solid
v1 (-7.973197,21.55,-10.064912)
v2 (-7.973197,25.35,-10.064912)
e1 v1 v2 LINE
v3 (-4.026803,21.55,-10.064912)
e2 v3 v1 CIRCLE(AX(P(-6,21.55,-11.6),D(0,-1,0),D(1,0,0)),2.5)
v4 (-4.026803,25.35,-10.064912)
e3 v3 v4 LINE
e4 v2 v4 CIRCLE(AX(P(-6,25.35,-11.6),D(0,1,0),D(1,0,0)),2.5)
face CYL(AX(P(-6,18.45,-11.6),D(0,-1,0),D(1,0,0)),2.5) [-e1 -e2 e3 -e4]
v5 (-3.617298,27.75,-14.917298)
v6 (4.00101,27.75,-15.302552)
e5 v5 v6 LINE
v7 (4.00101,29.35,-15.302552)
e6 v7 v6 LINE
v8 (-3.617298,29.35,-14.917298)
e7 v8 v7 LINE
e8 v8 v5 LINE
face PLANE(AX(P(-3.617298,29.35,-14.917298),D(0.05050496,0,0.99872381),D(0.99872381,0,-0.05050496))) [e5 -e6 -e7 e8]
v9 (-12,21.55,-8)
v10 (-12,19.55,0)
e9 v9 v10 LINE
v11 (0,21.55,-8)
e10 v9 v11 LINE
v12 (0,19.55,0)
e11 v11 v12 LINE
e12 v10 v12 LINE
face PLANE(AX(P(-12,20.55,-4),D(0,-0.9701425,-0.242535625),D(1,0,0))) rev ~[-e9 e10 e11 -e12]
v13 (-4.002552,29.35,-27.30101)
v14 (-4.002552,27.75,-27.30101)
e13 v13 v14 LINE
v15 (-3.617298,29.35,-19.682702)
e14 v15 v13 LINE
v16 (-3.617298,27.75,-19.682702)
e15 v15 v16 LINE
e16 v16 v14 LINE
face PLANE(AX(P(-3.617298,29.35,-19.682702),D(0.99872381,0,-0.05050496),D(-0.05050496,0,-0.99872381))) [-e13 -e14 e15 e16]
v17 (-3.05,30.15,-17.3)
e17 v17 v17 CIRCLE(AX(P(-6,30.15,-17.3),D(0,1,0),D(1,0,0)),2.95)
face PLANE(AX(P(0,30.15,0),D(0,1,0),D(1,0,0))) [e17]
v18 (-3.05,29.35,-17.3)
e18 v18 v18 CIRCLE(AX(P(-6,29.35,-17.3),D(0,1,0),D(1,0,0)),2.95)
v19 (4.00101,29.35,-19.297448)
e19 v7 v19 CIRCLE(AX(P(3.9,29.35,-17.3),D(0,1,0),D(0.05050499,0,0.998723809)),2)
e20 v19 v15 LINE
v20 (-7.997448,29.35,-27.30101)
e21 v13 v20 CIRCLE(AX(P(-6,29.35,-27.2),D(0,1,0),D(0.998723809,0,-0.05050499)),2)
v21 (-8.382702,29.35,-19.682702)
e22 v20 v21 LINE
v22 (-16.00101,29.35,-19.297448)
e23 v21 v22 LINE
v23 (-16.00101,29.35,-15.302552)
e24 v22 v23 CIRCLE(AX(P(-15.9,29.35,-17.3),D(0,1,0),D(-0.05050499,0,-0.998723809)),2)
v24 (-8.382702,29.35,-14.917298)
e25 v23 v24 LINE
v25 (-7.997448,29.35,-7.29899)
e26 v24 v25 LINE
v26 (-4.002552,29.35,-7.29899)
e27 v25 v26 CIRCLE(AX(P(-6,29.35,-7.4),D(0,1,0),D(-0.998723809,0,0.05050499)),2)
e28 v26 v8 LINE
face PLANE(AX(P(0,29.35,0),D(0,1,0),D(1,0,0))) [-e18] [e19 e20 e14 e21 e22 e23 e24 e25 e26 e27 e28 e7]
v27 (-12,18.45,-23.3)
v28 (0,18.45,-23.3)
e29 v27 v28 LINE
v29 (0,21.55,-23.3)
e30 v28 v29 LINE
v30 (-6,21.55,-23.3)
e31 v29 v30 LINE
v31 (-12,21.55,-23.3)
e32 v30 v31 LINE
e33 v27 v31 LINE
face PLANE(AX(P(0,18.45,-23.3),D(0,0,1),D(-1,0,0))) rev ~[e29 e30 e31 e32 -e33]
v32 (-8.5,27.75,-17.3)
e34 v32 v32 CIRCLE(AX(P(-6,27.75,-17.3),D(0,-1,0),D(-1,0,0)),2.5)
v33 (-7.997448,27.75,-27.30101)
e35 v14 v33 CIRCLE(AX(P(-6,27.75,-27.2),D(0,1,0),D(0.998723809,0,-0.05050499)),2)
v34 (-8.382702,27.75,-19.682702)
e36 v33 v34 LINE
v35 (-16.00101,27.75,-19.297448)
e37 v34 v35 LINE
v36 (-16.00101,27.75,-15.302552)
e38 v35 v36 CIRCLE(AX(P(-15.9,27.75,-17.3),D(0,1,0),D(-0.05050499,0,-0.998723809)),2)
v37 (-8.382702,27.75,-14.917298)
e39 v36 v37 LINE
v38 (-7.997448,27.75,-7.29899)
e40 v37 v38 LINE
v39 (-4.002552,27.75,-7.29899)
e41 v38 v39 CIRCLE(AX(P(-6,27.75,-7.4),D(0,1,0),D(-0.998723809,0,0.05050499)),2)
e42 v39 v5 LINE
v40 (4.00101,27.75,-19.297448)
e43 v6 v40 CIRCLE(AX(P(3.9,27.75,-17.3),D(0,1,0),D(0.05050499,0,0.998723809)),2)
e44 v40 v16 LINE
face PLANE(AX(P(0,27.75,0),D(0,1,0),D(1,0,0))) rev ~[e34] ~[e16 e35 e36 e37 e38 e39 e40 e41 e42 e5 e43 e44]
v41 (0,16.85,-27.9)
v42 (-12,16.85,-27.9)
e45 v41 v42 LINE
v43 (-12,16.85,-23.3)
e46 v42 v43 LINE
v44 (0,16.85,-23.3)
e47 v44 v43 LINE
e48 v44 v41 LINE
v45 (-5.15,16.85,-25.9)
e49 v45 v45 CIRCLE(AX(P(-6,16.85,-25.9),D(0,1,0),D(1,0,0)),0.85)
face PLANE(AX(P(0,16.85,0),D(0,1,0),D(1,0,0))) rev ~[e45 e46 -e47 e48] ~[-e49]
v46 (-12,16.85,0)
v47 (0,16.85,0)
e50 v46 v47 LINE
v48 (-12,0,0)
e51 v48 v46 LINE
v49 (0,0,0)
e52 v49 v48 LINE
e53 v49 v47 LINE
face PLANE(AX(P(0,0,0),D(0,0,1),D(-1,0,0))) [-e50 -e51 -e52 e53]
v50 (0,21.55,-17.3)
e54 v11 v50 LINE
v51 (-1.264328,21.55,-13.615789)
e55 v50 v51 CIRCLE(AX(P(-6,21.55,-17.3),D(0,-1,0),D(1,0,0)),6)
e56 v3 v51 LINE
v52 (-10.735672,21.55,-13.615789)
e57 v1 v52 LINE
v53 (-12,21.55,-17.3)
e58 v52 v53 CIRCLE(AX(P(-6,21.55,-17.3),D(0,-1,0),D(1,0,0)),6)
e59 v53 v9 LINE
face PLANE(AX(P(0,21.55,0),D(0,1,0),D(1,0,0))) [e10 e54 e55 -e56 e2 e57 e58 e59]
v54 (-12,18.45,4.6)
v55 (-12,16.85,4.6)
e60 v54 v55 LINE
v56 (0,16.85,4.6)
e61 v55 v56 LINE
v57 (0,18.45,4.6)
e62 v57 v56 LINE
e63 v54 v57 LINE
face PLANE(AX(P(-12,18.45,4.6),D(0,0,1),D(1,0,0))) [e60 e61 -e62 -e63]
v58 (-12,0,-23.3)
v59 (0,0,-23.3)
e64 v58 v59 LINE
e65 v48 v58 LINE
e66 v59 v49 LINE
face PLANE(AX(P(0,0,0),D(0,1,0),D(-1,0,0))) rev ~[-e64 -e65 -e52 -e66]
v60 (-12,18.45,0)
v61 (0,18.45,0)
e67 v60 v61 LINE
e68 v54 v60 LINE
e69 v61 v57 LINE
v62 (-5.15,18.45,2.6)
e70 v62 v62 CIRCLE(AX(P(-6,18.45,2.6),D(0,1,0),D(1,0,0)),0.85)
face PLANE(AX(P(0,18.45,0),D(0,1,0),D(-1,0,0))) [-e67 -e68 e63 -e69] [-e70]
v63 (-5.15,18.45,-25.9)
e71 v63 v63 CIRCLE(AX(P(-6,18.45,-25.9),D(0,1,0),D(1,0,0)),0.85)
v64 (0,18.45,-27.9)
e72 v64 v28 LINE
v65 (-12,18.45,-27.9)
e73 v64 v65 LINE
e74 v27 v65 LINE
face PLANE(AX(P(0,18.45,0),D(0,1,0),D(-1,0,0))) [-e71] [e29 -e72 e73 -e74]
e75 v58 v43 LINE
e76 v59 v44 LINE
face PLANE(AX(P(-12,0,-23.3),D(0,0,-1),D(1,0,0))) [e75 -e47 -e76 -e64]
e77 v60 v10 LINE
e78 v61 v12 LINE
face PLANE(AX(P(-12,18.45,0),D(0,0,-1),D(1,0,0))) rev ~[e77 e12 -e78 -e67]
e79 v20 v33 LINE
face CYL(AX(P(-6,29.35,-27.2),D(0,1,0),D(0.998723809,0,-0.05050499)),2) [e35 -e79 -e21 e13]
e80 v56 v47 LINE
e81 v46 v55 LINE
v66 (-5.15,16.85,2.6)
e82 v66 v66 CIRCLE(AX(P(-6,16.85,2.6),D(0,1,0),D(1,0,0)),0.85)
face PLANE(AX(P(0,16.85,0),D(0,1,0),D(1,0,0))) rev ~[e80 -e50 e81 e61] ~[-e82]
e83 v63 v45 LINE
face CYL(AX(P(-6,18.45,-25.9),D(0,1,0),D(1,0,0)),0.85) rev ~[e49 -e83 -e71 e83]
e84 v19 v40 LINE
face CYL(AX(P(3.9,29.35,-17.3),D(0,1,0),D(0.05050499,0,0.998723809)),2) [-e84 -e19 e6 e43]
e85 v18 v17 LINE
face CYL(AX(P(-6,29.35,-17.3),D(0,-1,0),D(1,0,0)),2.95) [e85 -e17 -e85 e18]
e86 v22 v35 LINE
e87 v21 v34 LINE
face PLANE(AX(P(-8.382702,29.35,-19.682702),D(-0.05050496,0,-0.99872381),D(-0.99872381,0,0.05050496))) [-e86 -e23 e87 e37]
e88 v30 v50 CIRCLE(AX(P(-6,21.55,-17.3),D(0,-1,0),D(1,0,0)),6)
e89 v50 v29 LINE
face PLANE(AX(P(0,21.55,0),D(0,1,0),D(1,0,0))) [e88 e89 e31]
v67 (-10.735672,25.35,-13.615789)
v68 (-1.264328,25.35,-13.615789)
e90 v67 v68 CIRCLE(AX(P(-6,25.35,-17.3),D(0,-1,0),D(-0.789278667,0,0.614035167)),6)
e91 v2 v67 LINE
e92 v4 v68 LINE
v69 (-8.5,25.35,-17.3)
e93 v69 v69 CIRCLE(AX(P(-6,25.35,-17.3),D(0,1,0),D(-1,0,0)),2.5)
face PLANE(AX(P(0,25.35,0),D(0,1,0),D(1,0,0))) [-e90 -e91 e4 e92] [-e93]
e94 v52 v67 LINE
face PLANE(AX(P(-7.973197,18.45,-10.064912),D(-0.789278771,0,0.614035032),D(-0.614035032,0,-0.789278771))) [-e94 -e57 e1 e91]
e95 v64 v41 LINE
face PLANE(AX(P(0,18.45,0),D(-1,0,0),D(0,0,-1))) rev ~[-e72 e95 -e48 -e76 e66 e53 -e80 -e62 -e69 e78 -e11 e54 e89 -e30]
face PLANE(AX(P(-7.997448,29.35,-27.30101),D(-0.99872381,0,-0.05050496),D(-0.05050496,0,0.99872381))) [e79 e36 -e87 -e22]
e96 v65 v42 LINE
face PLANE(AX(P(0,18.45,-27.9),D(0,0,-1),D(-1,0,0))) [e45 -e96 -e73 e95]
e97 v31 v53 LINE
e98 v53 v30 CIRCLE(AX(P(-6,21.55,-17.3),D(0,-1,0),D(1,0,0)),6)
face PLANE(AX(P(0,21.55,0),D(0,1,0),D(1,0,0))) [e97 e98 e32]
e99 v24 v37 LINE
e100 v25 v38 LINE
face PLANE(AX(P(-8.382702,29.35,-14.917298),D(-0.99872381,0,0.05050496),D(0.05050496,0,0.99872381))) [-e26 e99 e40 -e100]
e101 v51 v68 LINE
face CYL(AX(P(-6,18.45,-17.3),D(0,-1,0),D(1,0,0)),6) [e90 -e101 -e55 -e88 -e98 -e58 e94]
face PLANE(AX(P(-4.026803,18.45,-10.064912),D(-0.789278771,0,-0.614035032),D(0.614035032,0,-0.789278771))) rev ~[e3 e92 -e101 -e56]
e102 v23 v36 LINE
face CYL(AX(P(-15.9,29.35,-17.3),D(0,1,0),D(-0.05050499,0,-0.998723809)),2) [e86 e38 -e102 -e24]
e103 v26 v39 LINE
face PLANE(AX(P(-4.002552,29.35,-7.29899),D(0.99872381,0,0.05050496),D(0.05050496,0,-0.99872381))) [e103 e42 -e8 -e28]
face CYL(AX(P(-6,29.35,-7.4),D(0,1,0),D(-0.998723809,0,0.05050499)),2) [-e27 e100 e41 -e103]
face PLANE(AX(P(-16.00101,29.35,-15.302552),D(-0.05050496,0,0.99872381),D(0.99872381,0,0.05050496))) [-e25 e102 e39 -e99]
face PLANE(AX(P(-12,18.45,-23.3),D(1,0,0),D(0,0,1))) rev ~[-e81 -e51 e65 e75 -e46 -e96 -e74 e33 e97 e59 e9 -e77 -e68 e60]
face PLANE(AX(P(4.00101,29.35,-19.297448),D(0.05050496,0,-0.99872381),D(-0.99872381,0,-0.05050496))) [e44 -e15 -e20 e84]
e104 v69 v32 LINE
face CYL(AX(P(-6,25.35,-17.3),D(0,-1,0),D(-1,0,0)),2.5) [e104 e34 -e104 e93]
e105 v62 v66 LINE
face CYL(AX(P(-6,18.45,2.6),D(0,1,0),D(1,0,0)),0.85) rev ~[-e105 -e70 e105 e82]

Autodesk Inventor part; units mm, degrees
ref_plane "YZ Plane" through (0, 0, 0) normal (1, 0, 0) x (0, 1, 0)
ref_plane "XZ Plane" through (0, 0, 0) normal (0, 1, 0) x (-1, 0, 0)
sketch "スケッチ1" plane through (0, 0, 0) normal (0, 1, 0) x (-1, 0, 0)
  line L0 (0, 0) -> (12, 0)
  line L1 (12, 0) -> (12, -23.3)
  line L2 (12, -23.3) -> (0, -23.3)
  line L3 (0, -23.3) -> (0, 0)
  dimension "d0" = 23.3
  dimension "d1" = 12
extrude "押し出し1" add sketch "スケッチ1" along normal blind 18.45
sketch "スケッチ2" plane through (0, 18.45, 0) normal (0, 1, 0) x (1, 0, 0)
  circle A0 centre (-6, 17.3) radius 6
  line L0 (-12, 23.3) -> (-12, 0)
  line L1 (0, 0) -> (0, 23.3)
  line L2 (0, 23.3) -> (-12, 23.3)
  circle A1 centre (-6, 11.6) radius 2.5
  line L3 (-7.973197, 10.064912) -> (-10.735672, 13.615789)
  line L4 (-4.026803, 10.064912) -> (-1.264328, 13.615789)
  point P0 (-8.488419, 11.840351)
  point P1 (-3.511581, 11.840351)
  dimension "d20" = 5.7
  dimension "d21" = 5
extrude "押し出し2" add sketch "スケッチ2" along normal blind 6.9 contours A0 A1 | L4 A1 A0 | A1 A0 | A0 A1 | A1 L3 A0
sketch "スケッチ3" plane through (-6, 25.35, -17.3) normal (0, 1, 0) x (-1, 0, 0)
  arc A0 (-4.735672, 3.684211) -> (4.735672, 3.684211) centre (0, 0) ccw
  circle A1 centre (0, 0) radius 2.5
  point P0 (-6, 17.3)
  point P1 (-2.386497, 4.955263)
  point P2 (2.386497, 4.955263)
  dimension "d6" = 5
extrude "押し出し3" add sketch "スケッチ3" along normal blind 3.1
sketch "スケッチ4" plane through (0, 18.45, 0) normal (0, 1, 0) x (1, 0, 0)
  line L0 (0, 0) -> (0, 23.3) projected
  line L1 (0, 17.3) -> (0, 23.3) projected
  line L2 (0, 0) -> (0, 17.3) projected
  line L3 (0, 23.3) -> (-12, 23.3) projected
  line L4 (0, 0) -> (0, 23.3) projected
  line L5 (-12, 0) -> (0, 0) projected
  line L6 (-12, 23.3) -> (-12, 0) projected
  line L7 (-12, -4.6) -> (0, -4.6)
  line L8 (0, -4.6) -> (0, 27.9)
  line L9 (0, 27.9) -> (-12, 27.9)
  line L10 (-12, 27.9) -> (-12, -4.6)
  line L11 (-12, -2.6) -> (0, -2.6) construction
  line L12 (0, -2.6) -> (0, 25.9) construction
  line L13 (0, 25.9) -> (-12, 25.9) construction
  line L14 (-12, 25.9) -> (-12, -2.6) construction
  line L15 (0, 17.3) -> (0, 23.3) projected
  circle A0 centre (-6, -2.6) radius 0.85
  circle A1 centre (-6, 25.9) radius 0.85
  point P0 (-12, 11.65)
  point P1 (-12, 23.3)
  dimension "d9" = 32.5
  dimension "d10" = 28.5
  dimension "d11" = 1.7
  dimension "d12" = 1.7
extrude "押し出し4" add sketch "スケッチ4" against normal blind 1.6 contours L8 L7 L10 L5 | L3 L10 L9 L8
sketch "スケッチ5" plane through (0, 18.45, 0) normal (0, 1, 0) x (1, 0, 0)
  line L0 (0, 23.3) -> (-12, 23.3) projected
  line L1 (0, 0) -> (0, 23.3) projected
  line L2 (-12, 0) -> (0, 0) projected
  line L3 (-12, 23.3) -> (-12, 0) projected
extrude "押し出し5" add sketch "スケッチ5" along normal blind 3.1
chamfer "面取り1" distance 8 distance2 2 1 edges at (-6, 21.55, 0) measured on face at (-6, 21.55, -3.0333)
ref_plane "作業平面1" through (0, 29.35, 0) normal (0, 1, 0) x (1, 0, 0)
sketch "スケッチ6" plane through (0, 29.35, 0) normal (0, 1, 0) x (1, 0, 0)
  circle A0 centre (-6, 17.3) radius 2.5
  circle A1 centre (-6, 17.3) radius 11.9
  circle A2 centre (-6, 27.2) radius 2
  circle A3 centre (-15.9, 17.3) radius 2
  circle A4 centre (-6, 7.4) radius 2
  circle A5 centre (3.9, 17.3) radius 2
  line L0 (4.00101, 19.297448) -> (-5.873737, 19.79681)
  line L1 (-5.873737, 14.80319) -> (4.00101, 15.302552)
  line L2 (-7.997448, 27.30101) -> (-8.49681, 17.426263)
  line L3 (-3.50319, 17.426263) -> (-4.002552, 27.30101)
  line L4 (-16.00101, 15.302552) -> (-6.126263, 14.80319)
  line L5 (-6.126263, 19.79681) -> (-16.00101, 19.297448)
  line L6 (-4.002552, 7.29899) -> (-3.50319, 17.173737)
  line L7 (-8.49681, 17.173737) -> (-7.997448, 7.29899)
  point P0 (0, 0)
  point P1 (-8.382702, 14.917298)
  point P2 (-7.997448, 7.29899)
  point P3 (-4.002552, 7.29899)
  point P4 (-3.617298, 14.917298)
  point P5 (-3.617298, 19.682702)
  point P6 (-4.002552, 27.30101)
  point P7 (-7.997448, 27.30101)
  point P8 (-8.382702, 19.682702)
  point P9 (-16.00101, 19.297448)
  dimension "d34" = 23.8
  dimension "d35" = 4
  dimension "d38" = 360
  dimension "d42" = 360
sketch "スケッチ6 outline for 押し出し6" plane through (0, 29.35, 0) normal (0, 1, 0) x (1, 0, 0)
  line L0 (-8.382702, 14.917298) -> (-7.997448, 7.29899)
  arc A0 (-7.997448, 7.29899) -> (-4.002552, 7.29899) centre (-6, 7.4) ccw
  line L1 (-4.002552, 7.29899) -> (-3.617298, 14.917298)
  line L2 (-3.617298, 14.917298) -> (4.00101, 15.302552)
  arc A1 (4.00101, 15.302552) -> (4.00101, 19.297448) centre (3.9, 17.3) ccw
  line L3 (4.00101, 19.297448) -> (-3.617298, 19.682702)
  line L4 (-3.617298, 19.682702) -> (-4.002552, 27.30101)
  arc A2 (-4.002552, 27.30101) -> (-7.997448, 27.30101) centre (-6, 27.2) ccw
  line L5 (-7.997448, 27.30101) -> (-8.382702, 19.682702)
  line L6 (-8.382702, 19.682702) -> (-16.00101, 19.297448)
  arc A3 (-16.00101, 19.297448) -> (-16.00101, 15.302552) centre (-15.9, 17.3) ccw
  line L7 (-16.00101, 15.302552) -> (-8.382702, 14.917298)
extrude "押し出し6" add sketch "スケッチ6 outline for 押し出し6" against normal blind 1.6
sketch "スケッチ7" plane through (0, 29.35, 0) normal (0, 1, 0) x (1, 0, 0)
  circle A0 centre (-6, 17.3) radius 2.5 projected
  circle A1 centre (-6, 17.3) radius 2.95
  point P0 (0, 0)
  dimension "d46" = 5.9
extrude "押し出し7" add sketch "スケッチ7" along normal blind 0.8 contours A0 | A1
properties part number "FT90MR" material "ABS プラスチック"
